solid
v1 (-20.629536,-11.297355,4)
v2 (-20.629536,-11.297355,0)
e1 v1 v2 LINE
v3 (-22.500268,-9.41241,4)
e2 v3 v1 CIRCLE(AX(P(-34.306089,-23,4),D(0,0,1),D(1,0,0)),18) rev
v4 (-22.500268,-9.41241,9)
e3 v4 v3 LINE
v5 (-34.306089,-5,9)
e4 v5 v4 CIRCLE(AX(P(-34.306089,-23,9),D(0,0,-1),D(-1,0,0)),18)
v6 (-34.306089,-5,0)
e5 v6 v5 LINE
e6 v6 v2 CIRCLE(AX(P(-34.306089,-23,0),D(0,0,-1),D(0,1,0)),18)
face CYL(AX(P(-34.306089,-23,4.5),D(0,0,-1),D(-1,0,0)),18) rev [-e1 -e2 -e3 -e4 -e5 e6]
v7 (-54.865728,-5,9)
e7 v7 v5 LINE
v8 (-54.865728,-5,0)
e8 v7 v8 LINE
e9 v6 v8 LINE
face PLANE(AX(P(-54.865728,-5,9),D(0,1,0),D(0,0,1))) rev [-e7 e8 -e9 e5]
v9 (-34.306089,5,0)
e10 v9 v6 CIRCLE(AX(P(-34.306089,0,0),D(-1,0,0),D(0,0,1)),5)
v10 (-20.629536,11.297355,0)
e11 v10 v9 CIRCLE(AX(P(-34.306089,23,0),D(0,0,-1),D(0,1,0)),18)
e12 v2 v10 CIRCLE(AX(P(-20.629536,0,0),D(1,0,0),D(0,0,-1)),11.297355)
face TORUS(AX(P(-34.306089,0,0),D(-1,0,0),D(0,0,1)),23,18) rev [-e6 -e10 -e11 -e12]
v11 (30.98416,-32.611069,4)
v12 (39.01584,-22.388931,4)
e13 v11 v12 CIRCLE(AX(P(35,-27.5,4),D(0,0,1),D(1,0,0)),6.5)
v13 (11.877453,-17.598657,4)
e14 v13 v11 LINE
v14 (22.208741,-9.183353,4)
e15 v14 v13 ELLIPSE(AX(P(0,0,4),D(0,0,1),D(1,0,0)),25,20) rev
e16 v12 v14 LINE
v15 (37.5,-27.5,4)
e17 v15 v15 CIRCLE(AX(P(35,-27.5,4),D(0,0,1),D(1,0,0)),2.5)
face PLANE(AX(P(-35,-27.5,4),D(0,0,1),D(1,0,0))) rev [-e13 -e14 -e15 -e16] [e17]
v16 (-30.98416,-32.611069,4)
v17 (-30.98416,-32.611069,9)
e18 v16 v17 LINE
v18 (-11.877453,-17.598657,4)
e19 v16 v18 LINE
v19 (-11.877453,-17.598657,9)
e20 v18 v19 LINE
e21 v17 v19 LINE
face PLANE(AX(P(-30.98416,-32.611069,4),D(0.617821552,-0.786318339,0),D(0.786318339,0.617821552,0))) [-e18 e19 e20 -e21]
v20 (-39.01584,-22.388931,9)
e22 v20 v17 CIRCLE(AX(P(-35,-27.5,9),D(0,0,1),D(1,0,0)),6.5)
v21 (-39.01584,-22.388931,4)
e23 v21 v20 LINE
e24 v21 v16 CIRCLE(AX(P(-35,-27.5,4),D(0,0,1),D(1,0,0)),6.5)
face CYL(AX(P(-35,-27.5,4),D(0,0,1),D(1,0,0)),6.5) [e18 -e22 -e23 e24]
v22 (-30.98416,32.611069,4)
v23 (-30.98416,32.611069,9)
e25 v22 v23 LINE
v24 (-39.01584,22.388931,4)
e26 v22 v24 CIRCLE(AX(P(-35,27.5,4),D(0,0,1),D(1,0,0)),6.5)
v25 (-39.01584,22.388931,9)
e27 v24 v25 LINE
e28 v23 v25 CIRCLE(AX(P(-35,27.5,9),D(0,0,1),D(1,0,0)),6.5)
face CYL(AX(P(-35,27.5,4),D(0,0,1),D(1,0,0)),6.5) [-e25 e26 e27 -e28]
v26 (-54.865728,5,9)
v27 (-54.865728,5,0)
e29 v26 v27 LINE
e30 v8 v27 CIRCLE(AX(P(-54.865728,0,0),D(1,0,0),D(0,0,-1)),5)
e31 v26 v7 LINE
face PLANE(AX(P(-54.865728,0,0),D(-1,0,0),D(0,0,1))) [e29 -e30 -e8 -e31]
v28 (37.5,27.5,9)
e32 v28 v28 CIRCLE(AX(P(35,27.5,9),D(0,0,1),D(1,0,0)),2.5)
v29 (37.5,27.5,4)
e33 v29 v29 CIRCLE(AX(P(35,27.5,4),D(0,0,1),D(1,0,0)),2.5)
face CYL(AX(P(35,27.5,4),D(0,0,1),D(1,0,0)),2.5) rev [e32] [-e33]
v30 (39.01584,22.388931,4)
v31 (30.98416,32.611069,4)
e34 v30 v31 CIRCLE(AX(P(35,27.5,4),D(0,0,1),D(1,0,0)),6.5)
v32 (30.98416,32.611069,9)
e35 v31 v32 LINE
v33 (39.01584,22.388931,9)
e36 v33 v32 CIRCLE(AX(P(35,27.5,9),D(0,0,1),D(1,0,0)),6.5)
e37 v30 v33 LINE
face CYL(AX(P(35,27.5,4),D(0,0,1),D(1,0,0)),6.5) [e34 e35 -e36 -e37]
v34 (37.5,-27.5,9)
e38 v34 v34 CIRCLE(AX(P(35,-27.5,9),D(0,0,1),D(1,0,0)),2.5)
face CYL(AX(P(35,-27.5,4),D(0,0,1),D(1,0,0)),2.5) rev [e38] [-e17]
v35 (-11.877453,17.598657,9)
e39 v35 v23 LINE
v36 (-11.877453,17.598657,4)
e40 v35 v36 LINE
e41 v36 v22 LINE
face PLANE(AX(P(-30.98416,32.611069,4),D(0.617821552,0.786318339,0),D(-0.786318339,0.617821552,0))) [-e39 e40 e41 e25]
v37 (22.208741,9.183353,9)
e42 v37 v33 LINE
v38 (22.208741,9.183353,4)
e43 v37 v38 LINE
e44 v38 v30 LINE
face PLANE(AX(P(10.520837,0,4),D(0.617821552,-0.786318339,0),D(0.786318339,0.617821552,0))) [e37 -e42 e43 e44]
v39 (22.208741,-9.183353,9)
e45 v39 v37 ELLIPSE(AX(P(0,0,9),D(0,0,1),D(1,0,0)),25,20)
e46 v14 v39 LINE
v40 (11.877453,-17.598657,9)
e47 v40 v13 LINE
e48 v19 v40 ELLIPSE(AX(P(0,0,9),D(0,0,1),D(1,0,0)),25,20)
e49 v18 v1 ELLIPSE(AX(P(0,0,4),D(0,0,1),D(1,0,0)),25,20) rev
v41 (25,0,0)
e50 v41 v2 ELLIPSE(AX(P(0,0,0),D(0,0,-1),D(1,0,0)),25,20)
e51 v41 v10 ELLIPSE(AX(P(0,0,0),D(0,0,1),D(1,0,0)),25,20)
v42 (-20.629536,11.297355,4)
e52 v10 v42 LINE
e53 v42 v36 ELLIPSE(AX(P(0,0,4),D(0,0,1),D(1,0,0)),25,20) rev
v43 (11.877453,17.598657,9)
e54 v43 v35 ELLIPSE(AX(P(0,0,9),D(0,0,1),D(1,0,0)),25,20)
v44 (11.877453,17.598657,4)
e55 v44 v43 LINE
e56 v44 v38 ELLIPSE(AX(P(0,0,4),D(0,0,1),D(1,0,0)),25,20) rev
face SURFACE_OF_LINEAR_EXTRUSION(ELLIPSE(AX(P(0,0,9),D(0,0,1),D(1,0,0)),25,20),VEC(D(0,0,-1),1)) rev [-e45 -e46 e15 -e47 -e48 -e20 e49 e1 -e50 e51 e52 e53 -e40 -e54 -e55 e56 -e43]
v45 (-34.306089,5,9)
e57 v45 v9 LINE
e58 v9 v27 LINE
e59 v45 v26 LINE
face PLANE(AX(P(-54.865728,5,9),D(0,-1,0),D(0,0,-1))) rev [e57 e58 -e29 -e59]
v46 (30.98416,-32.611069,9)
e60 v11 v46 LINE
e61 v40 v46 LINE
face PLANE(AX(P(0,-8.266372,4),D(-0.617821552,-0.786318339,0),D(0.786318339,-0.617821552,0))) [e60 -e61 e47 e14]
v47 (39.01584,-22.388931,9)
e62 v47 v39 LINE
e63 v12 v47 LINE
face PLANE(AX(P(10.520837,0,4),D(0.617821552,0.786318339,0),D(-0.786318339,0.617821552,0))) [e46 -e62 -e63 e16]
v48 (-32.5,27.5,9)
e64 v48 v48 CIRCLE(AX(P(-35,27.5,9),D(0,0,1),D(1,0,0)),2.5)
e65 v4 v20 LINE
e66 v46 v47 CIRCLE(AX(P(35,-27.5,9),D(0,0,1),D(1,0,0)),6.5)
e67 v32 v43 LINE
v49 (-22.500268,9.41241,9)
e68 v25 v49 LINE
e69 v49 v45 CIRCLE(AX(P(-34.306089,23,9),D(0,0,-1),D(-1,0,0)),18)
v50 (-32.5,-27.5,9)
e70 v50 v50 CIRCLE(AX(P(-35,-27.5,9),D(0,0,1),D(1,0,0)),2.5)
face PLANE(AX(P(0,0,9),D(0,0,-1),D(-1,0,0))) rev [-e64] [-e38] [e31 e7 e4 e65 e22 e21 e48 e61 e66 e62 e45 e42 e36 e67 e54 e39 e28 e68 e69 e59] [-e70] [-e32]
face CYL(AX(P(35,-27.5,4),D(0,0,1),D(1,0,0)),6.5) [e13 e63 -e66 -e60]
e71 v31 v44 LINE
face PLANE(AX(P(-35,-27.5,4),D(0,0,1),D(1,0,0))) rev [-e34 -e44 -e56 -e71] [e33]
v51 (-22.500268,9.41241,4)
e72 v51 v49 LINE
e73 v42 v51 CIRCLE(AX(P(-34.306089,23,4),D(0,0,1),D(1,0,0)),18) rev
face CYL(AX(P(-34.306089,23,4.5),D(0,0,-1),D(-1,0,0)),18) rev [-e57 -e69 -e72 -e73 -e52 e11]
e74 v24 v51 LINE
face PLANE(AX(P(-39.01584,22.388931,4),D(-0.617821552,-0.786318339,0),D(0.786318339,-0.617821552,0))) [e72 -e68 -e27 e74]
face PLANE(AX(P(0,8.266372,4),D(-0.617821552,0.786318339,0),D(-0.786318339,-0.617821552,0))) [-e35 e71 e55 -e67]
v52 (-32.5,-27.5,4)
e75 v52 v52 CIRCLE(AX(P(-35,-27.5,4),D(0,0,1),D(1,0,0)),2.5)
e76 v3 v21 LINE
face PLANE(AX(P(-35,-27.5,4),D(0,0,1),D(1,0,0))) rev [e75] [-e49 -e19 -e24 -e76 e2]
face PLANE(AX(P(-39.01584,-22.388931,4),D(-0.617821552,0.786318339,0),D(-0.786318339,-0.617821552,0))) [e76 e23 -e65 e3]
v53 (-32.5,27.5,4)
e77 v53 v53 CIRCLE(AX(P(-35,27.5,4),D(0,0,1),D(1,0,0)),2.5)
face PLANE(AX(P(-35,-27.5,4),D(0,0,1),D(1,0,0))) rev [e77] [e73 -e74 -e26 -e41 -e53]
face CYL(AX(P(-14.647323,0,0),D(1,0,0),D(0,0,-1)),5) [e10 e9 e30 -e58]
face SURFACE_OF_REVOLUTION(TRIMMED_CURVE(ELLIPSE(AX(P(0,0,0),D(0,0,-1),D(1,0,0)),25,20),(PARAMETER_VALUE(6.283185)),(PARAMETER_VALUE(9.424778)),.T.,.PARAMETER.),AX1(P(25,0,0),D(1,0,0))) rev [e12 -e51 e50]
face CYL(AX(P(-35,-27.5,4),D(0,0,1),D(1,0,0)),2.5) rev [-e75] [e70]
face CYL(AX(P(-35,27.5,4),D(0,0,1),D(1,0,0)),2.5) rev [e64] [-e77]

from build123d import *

# Parameters (mm, degrees)
R_VOLUTION2_ANGLE  = 180.0000000000004
R_VOLUTION4_START  = -54.865727699
R_VOLUTION4_DEPTH  = 30.659581785
CONG_1_R           = 18
ESQUISSE8_W        = 51.11842194222049
ESQUISSE8_H        = 9.999999999999993
BOSS_EXTRU_6_DEPTH = 9
ESQUISSE11_R       = 2.5000000000000115
ESQUISSE11_R_2     = 2.5000000000000027
ESQUISSE11_R_3     = 2.499999999999987
ESQUISSE11_R_4     = 2.4999999999999956
BOSS_EXTRU_8_DEPTH = 5
ESQUISSE12_RX      = 24.999999999999993
ESQUISSE12_RY      = 20
BOSS_EXTRU_9_DEPTH = 9
CONG_5_R           = 18


# Read off the part's stored shape, not the designer's step: Révolution4
with BuildPart() as part:
    # Esquisse1 → Révolution2 (revolve)
    with BuildSketch(Plane.XY):
        with BuildLine():
            Line((24.999999999999993, 0), (-24.999999999999993, 0))
            add(Edge.make_bspline(
                [(24.999999999999993, 0), (25.000000000000018, 19.999999999999996), (6.58e-15, 20), (-24.999999999999996, 20.000000000000004), (-24.999999999999993, 0)],
                knots=[3.141592653589792, 3.141592653589792, 3.141592653589792, 4.712388980384689, 4.712388980384689, 6.283185307179585, 6.283185307179585, 6.283185307179585], degree=2, weights=[1, 0.7071067811865475, 1, 0.7071067811865475, 1]))
        make_face()
    revolve(axis=Axis((24.999999999999993, 0, 0), (-1, 0, 0)), revolution_arc=R_VOLUTION2_ANGLE)

    # Révolution4 outline → Révolution4 (add)
    with BuildSketch(Plane.YZ.offset(R_VOLUTION4_START)):
        with BuildLine():
            Line((5, 0), (-5, 0))
            ThreePointArc((-5, 0), (0, -5), (5, 0))
        make_face()
    extrude(amount=R_VOLUTION4_DEPTH)

    # Congé1
    cong_1_edges = [part.edges().sort_by_distance(p)[0] for p in [
        (-24.206145913999997, 1.4e-16, -5),
    ]]
    fillet(cong_1_edges, radius=CONG_1_R)

    # Esquisse8 → Boss.-Extru.6 (add)
    with BuildSketch(Plane.XY):
        with Locations((-29.30651672831175, 0)):
            Rectangle(ESQUISSE8_W, ESQUISSE8_H)
    extrude(amount=BOSS_EXTRU_6_DEPTH)

    # Esquisse11 → Boss.-Extru.8 (add)
    with BuildSketch(Plane.XY.offset(9)):
        with BuildLine():
            Line((-39.015840087557386, -22.388930797654275), (-10.520837254179238, -1.214e-14))
            Line((-10.520837254179238, -1.214e-14), (-39.015840087557386, 22.38893079765424))
            ThreePointArc((-39.015840087557386, 22.38893079765424), (-40.11106920234576, 31.515840087557358), (-30.984159912442646, 32.61106920234573))
            Line((-30.984159912442646, 32.61106920234573), (1.041e-14, 8.266372128283678))
            Line((1.041e-14, 8.266372128283678), (30.984159912442635, 32.611069202345746))
            ThreePointArc((30.984159912442635, 32.611069202345746), (40.11106920234576, 31.515840087557383), (39.015840087557386, 22.38893079765424))
            Line((39.015840087557386, 22.38893079765424), (10.520837254179254, -1.518e-14))
            Line((10.520837254179254, -1.518e-14), (39.015840087557386, -22.388930797654243))
            ThreePointArc((39.015840087557386, -22.388930797654243), (40.111069202345746, -31.515840087557372), (30.98415991244264, -32.61106920234575))
            Line((30.98415991244264, -32.61106920234575), (4.77e-15, -8.2663721282837))
            Line((4.77e-15, -8.2663721282837), (-30.984159912442642, -32.611069202345774))
            ThreePointArc((-30.984159912442642, -32.611069202345774), (-40.11106920234576, -31.51584008755739), (-39.015840087557386, -22.388930797654275))
        make_face()
        with Locations((-35.000000000000014, -27.50000000000002)):
            Circle(ESQUISSE11_R, mode=Mode.SUBTRACT)
        with Locations((-35.000000000000014, 27.499999999999986)):
            Circle(ESQUISSE11_R_2, mode=Mode.SUBTRACT)
        with Locations((35, 27.5)):
            Circle(ESQUISSE11_R_3, mode=Mode.SUBTRACT)
        with Locations((35, -27.500000000000007)):
            Circle(ESQUISSE11_R_4, mode=Mode.SUBTRACT)
    extrude(amount=-BOSS_EXTRU_8_DEPTH)

    # Esquisse12 → Boss.-Extru.9 (add)
    with BuildSketch(Plane.XY):
        with Locations((0, 0)):
            Ellipse(ESQUISSE12_RX, ESQUISSE12_RY)
    extrude(amount=BOSS_EXTRU_9_DEPTH)

    # Congé5
    cong_5_edges = [part.edges().sort_by_distance(p)[0] for p in [
        (-24.206145913796348, 4.9999999999999964, 4.499999999999834),
        (-24.20614591379635, -4.9999999999999964, 4.499999999999834),
    ]]
    fillet(cong_5_edges, radius=CONG_5_R - 0.0001)  # a hair under: the kernel refuses the full size


solid = part.part
